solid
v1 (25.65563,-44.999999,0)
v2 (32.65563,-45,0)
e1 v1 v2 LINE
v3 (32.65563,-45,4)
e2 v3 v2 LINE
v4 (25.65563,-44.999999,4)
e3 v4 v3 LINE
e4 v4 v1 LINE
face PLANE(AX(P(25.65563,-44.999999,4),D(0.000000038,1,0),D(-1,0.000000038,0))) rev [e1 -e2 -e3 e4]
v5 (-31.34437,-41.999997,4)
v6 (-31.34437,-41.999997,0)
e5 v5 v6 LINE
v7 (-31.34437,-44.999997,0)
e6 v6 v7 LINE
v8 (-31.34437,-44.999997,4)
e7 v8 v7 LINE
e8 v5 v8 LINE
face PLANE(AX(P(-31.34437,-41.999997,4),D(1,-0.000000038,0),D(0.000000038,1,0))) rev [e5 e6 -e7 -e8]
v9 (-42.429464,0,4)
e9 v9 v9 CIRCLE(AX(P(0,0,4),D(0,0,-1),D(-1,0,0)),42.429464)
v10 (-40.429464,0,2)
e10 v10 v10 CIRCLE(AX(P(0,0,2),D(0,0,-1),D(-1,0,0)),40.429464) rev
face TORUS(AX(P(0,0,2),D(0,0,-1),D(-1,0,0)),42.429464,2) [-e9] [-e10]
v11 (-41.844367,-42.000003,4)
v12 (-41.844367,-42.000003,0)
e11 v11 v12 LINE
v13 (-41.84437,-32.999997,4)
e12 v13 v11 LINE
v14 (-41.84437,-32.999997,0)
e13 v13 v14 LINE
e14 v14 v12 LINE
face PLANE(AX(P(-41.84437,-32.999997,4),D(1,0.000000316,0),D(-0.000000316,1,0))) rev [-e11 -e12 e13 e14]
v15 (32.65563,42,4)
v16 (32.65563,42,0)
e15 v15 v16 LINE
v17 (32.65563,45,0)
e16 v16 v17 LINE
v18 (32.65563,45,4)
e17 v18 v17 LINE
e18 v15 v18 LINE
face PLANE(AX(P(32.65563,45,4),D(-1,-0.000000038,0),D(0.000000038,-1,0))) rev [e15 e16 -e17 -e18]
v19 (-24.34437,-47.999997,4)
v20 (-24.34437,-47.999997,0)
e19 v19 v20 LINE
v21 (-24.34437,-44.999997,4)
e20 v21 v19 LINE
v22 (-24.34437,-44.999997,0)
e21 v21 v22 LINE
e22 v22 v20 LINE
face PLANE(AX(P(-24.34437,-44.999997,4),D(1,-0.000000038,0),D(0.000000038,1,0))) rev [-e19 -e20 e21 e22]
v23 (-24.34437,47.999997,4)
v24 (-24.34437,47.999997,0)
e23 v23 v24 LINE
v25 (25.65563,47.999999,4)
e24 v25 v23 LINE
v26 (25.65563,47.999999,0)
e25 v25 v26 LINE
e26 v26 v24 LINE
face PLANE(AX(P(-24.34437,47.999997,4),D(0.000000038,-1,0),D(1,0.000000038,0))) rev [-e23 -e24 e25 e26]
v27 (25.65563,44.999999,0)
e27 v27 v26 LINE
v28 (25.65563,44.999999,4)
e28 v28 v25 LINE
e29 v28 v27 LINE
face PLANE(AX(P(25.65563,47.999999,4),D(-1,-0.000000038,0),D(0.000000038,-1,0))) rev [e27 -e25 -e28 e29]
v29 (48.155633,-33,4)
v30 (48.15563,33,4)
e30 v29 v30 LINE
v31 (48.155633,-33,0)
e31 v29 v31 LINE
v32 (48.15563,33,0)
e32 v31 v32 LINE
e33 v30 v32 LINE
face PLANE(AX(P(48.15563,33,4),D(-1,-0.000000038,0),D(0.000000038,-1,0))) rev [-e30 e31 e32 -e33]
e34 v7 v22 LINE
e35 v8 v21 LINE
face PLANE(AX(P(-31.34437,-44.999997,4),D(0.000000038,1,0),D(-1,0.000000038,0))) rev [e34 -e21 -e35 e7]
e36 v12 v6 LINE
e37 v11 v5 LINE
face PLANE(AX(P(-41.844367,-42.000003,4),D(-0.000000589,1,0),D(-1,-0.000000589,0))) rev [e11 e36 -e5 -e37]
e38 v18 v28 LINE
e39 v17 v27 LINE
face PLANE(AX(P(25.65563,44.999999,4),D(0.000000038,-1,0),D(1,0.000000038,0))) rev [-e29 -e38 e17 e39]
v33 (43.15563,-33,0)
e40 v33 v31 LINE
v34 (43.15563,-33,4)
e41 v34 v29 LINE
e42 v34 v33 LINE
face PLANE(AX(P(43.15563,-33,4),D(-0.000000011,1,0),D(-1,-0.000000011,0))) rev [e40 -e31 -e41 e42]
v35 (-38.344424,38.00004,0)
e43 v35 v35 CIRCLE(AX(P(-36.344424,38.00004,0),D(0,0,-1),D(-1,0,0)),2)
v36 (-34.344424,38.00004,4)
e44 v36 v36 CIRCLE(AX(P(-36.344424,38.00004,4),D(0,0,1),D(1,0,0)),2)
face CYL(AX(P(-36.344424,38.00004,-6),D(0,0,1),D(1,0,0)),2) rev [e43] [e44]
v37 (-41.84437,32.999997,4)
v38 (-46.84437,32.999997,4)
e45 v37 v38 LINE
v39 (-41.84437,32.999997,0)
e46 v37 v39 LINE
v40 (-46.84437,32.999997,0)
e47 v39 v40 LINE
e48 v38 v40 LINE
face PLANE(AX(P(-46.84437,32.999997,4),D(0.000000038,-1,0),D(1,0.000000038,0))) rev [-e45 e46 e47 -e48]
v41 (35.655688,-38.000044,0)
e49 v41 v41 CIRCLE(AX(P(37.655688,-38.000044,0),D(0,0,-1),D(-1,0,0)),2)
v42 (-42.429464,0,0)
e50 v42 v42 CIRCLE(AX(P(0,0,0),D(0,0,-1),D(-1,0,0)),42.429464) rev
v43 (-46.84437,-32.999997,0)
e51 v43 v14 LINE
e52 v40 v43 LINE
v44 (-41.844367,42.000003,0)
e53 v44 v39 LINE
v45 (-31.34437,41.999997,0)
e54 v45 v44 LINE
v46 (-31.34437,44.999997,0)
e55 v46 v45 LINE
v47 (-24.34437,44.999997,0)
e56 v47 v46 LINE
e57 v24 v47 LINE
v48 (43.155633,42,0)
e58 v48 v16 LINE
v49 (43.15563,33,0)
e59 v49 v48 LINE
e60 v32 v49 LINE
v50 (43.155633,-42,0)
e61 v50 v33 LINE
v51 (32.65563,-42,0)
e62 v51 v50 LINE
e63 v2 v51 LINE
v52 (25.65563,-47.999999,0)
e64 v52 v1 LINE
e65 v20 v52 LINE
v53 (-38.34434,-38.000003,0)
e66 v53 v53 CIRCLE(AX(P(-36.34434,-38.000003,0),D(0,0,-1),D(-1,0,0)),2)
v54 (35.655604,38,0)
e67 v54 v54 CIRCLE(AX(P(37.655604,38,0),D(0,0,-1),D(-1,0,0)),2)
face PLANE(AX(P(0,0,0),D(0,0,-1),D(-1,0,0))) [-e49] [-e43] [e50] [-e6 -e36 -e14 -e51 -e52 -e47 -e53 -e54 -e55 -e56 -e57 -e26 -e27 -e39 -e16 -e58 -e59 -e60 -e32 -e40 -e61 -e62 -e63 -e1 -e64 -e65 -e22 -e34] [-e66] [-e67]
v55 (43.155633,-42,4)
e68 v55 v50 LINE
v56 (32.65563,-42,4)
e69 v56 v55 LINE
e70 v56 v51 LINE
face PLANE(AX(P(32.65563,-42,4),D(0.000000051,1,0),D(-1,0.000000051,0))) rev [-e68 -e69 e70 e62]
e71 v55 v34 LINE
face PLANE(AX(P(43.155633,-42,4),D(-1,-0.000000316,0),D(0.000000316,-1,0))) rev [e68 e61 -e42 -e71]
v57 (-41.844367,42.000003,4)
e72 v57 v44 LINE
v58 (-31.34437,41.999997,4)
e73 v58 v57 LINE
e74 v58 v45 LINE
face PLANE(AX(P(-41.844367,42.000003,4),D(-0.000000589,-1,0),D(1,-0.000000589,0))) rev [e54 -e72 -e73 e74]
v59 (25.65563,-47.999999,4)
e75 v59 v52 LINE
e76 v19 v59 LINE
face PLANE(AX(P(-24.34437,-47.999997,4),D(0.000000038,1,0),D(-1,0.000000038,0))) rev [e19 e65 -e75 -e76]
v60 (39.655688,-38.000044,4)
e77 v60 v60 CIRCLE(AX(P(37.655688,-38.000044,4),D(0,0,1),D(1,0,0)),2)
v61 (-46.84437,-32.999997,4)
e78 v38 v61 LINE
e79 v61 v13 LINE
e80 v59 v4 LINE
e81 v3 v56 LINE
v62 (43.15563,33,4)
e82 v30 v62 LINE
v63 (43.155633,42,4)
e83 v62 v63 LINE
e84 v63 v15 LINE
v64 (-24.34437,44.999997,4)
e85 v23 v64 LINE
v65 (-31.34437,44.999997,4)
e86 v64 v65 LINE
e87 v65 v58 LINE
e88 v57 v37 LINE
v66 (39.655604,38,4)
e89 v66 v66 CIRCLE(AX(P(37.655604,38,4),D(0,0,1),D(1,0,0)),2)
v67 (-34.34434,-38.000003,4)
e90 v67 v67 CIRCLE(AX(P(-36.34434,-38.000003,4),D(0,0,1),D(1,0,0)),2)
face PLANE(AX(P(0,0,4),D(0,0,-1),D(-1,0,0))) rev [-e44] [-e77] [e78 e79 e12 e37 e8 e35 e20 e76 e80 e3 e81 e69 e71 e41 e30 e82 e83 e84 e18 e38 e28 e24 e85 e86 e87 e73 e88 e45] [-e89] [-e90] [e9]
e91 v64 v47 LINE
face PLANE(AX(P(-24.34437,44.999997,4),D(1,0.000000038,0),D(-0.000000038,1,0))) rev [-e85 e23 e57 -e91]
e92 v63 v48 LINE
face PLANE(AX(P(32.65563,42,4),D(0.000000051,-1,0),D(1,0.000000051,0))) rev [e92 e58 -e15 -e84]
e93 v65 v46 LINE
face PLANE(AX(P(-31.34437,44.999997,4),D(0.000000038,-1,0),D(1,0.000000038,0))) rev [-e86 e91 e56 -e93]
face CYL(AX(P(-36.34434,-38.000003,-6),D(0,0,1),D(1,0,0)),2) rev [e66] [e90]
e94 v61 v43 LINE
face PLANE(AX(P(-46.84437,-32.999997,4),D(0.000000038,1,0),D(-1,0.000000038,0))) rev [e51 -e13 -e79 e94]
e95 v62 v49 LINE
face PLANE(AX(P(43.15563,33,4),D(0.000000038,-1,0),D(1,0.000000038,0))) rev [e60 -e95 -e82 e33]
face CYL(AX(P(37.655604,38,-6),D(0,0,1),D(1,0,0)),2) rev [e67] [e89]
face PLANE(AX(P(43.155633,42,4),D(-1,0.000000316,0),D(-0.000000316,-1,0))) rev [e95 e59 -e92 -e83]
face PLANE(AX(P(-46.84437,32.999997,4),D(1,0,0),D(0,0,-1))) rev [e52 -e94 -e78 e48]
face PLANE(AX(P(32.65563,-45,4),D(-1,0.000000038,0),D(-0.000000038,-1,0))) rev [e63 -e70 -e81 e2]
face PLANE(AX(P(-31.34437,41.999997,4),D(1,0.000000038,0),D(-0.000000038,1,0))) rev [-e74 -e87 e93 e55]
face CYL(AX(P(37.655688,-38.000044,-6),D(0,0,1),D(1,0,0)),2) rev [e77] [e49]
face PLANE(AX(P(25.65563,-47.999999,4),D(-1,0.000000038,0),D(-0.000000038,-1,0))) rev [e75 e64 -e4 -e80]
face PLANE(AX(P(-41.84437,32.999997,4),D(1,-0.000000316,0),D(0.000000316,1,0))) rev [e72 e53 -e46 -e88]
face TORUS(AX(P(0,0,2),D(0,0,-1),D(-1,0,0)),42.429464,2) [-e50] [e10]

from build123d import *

# Parameters (mm, degrees)
BOSS_EXTRUDE1_DEPTH = 4
SKETCH2_R           = 2
CUT_EXTRUDE1_DEPTH  = 10
SKETCH3_R           = 30
CUT_EXTRUDE2_DEPTH  = 10
SKETCH4_R           = 40.429464175
CUT_EXTRUDE3_DEPTH  = 69.109947193
FILLET5_R           = 2
FILLET6_R           = 2


with BuildPart() as part:
    # Sketch1 → Boss-Extrude1 (new body)
    with BuildSketch(Plane.XY):
        Polygon((-46.844369636, 32.999996521), (-41.844369636, 32.999996711), (-41.844366793, 42.000003289), (-31.344369977, 41.999997109), (-31.344370091, 44.999997109), (-24.344370091, 44.999997374), (-24.344370205, 47.999997374), (25.655629795, 47.99999927), (25.655629909, 44.99999927), (32.655629909, 44.999999535), (32.655630023, 41.999999535), (43.155633207, 42.000000067), (43.155630364, 32.999999933), (48.155630364, 33.000000123), (48.155632866, -32.999999877), (43.155630364, -32.999999933), (43.155633207, -42.000000067), (32.655630023, -41.999999535), (32.655629909, -44.999999535), (25.655629909, -44.99999927), (25.655629795, -47.99999927), (-24.344370205, -47.999997374), (-24.344370091, -44.999997374), (-31.344370091, -44.999997109), (-31.344369977, -41.999997109), (-41.844366793, -42.000003289), (-41.844369636, -32.999996711), (-46.844369636, -32.999996521), align=None)
    extrude(amount=BOSS_EXTRUDE1_DEPTH)

    # Sketch2 → Cut-Extrude1 (cut)
    with BuildSketch(Plane.XY.offset(4)):
        with Locations((-36.344424402, 38.000040227)):
            Circle(SKETCH2_R)
        with Locations((37.655687631, -38.000043584)):
            Circle(SKETCH2_R)
        with Locations((37.655603638, 37.999999725)):
            Circle(SKETCH2_R)
        with Locations((-36.344340408, -38.000003081)):
            Circle(SKETCH2_R)
    extrude(amount=-CUT_EXTRUDE1_DEPTH, mode=Mode.SUBTRACT)

    # Sketch3 → Cut-Extrude2 (cut)
    with BuildSketch(Plane.XY.offset(4)):
        Circle(SKETCH3_R)
    extrude(amount=-CUT_EXTRUDE2_DEPTH, mode=Mode.SUBTRACT)

    # Sketch4 → Cut-Extrude3 (cut, through all)
    with BuildSketch(Plane.XY.offset(4)):
        Circle(SKETCH4_R)
    extrude(amount=-CUT_EXTRUDE3_DEPTH, mode=Mode.SUBTRACT)

    # Fillet5
    fillet5_edges = [part.edges().sort_by_distance(p)[0] for p in [
        (-40.429464175, 0, 4),
    ]]
    fillet(fillet5_edges, radius=FILLET5_R)

    # Fillet6
    fillet6_edges = [part.edges().sort_by_distance(p)[0] for p in [
        (-40.429464175, 0, 0),
    ]]
    fillet(fillet6_edges, radius=FILLET6_R - 0.0001)  # a hair under: the kernel refuses the full size


solid = part.part
